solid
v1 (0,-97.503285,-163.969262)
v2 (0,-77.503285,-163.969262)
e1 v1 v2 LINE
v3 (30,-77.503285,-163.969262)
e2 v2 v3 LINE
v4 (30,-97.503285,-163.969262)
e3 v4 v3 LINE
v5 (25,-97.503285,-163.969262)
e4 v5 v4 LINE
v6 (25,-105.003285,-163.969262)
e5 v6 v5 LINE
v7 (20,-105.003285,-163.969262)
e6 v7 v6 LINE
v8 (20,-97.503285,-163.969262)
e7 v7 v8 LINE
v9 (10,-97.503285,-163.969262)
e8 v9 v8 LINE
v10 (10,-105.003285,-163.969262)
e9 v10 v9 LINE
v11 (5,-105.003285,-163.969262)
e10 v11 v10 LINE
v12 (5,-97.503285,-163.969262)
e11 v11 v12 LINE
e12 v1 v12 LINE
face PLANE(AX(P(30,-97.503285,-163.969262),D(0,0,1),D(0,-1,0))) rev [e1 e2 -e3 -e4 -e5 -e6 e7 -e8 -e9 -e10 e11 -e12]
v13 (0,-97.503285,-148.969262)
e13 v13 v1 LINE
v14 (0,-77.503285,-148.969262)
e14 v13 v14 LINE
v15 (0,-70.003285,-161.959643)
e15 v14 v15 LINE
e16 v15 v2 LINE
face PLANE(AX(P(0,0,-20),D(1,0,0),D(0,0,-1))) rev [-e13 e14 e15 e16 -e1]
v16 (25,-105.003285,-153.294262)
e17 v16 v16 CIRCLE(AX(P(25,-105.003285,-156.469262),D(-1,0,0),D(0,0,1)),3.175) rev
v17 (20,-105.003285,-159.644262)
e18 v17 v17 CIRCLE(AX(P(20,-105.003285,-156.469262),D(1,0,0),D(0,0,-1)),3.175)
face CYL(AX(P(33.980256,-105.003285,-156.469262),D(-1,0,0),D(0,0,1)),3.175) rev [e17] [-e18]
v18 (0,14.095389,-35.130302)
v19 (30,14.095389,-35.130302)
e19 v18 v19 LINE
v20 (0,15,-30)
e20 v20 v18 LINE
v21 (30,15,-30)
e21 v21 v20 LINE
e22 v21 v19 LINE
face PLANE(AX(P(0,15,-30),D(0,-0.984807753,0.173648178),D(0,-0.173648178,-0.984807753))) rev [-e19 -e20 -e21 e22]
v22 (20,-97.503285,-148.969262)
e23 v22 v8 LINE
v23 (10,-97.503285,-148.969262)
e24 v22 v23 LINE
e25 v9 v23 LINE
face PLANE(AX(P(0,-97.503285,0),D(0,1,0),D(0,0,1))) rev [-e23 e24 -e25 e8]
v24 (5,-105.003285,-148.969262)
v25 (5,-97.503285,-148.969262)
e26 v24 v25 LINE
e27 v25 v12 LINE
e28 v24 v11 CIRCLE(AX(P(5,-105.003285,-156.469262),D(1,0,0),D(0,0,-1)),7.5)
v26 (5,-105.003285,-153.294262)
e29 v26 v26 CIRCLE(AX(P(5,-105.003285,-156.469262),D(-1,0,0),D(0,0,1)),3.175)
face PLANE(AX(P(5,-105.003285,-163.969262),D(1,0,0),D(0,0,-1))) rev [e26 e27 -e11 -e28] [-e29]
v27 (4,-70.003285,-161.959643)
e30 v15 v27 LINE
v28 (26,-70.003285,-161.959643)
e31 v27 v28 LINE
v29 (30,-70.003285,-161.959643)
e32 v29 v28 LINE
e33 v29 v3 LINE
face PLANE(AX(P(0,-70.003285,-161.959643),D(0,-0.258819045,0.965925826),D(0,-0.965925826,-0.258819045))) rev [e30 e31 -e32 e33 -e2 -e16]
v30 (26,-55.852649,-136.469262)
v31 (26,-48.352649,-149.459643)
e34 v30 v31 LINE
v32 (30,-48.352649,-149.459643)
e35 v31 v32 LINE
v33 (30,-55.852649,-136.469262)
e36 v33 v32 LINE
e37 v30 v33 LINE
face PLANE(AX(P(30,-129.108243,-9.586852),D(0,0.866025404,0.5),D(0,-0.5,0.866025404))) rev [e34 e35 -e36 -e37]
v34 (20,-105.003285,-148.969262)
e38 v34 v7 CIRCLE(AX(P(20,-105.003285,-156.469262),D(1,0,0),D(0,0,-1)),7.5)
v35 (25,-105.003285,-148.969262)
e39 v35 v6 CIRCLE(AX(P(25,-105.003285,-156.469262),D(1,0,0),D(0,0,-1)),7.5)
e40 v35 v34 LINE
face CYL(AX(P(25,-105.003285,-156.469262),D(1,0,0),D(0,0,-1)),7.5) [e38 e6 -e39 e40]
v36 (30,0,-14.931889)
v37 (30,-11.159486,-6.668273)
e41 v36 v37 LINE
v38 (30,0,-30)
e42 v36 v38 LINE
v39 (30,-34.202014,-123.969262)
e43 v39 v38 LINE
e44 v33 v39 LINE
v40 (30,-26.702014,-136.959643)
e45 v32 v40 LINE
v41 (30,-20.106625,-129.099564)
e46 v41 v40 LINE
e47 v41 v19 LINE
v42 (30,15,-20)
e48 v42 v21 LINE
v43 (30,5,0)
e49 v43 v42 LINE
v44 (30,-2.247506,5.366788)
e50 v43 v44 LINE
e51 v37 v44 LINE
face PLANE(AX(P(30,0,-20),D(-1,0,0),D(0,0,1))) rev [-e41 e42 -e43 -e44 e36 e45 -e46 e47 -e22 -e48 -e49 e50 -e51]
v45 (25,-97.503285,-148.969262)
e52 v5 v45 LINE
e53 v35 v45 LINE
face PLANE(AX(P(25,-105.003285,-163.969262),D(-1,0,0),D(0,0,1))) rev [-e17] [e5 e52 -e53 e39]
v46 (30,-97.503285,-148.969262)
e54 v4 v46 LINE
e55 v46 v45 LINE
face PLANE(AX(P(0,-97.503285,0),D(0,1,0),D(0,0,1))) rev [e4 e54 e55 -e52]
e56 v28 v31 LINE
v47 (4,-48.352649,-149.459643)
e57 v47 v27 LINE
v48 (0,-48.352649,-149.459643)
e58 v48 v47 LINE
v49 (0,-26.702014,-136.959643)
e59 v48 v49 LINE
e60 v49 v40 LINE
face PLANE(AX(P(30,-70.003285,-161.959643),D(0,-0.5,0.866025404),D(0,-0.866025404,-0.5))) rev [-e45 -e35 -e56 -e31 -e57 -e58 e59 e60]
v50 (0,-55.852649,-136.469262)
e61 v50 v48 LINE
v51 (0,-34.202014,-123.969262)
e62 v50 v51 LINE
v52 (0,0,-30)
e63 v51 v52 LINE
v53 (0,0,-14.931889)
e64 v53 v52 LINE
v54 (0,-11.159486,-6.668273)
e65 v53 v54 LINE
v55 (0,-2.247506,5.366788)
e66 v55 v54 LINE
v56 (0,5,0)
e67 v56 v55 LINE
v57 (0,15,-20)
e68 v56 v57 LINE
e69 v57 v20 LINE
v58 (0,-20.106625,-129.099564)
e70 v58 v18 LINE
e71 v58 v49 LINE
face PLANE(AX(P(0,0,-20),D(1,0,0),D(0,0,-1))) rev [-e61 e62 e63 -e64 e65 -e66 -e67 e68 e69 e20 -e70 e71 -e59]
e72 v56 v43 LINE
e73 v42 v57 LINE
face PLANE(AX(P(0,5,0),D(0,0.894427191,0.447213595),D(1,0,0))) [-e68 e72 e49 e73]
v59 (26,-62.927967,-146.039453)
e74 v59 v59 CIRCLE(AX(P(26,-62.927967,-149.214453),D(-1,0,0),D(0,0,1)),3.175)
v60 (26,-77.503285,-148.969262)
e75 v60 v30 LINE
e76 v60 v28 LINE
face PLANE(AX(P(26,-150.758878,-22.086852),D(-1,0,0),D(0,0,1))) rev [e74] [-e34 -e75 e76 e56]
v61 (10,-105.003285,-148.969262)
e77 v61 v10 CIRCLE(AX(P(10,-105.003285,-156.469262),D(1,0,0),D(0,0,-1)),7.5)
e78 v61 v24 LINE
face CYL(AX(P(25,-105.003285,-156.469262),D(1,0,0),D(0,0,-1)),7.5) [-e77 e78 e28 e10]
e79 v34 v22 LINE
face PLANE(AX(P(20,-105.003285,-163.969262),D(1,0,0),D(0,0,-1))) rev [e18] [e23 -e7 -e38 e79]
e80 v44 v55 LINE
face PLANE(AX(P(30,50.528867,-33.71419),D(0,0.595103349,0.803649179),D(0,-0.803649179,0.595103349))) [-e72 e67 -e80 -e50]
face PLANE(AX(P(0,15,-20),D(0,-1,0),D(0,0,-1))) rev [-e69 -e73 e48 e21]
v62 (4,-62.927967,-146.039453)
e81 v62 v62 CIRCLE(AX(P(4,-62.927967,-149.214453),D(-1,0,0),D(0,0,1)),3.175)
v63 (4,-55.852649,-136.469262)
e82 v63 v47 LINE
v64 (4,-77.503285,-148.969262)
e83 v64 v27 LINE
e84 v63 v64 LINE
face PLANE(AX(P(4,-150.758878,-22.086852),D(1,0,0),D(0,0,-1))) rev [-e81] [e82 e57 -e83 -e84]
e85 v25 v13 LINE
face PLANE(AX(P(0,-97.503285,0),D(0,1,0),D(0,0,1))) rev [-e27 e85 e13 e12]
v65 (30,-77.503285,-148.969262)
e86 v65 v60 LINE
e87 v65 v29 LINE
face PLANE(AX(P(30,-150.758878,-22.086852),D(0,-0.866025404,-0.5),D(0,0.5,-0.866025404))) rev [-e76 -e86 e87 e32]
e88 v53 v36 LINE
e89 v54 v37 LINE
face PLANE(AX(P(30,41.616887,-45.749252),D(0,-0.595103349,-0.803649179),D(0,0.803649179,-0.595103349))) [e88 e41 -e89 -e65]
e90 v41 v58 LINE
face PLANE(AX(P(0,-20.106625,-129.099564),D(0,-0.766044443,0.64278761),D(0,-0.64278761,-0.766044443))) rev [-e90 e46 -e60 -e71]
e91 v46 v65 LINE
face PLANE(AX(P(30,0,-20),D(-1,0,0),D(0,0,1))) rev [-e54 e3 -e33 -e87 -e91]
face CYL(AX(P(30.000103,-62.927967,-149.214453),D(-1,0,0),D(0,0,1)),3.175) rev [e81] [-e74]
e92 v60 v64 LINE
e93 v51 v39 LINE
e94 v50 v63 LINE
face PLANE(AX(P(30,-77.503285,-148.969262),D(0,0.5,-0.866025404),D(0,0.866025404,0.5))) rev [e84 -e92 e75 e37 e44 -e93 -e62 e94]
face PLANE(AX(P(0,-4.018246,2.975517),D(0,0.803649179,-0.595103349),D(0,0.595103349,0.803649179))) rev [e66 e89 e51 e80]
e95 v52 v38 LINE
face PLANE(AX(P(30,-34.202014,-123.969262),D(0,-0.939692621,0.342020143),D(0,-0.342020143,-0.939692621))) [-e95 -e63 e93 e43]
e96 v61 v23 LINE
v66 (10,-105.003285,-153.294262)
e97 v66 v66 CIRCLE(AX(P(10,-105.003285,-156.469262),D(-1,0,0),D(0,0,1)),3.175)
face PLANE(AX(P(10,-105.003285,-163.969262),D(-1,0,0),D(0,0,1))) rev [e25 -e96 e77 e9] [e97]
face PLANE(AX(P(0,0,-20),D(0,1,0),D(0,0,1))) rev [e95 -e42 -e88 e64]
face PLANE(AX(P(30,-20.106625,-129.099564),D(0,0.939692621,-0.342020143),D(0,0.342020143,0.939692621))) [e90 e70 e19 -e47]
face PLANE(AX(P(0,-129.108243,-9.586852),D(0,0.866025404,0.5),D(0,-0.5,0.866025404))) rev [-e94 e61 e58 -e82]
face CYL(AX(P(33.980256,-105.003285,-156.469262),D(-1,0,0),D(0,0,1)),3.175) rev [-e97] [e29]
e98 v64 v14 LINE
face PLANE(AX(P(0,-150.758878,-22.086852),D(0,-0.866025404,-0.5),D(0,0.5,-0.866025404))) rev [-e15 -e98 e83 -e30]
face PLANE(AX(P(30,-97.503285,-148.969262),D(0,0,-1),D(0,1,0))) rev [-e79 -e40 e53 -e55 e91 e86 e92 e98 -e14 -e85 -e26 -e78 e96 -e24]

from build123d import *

# Parameters (mm, degrees)
SKETCH2_W                        = 30
SKETCH2_H                        = 15
BOSS_EXTRUDE1_DEPTH              = 10
BOUNDARY1_DEPTH                  = 30
BOSS_EXTRUDE2_DEPTH              = 30
SKETCH4_W                        = 30
SKETCH4_H                        = 15
BOSS_EXTRUDE3_DEPTH              = 100
SKETCH6_W                        = 18
SKETCH6_H                        = 15
BOSS_EXTRUDE4_DEPTH              = 9
BOSS_EXTRUDE5_DEPTH              = 18
CUT_EXTRUDE1_REACH               = 151.344
SKETCH8_R                        = 3
CUT_EXTRUDE2_REACH               = 139.38
SKETCH11_W                       = 30
SKETCH11_H                       = 15
SKETCH12_W                       = 30
SKETCH12_H                       = 15
BOSS_EXTRUDE7_DEPTH              = 50
BOSS_EXTRUDE8_DEPTH              = 30
SKETCH14_W                       = 30
SKETCH14_H                       = 15
BOSS_EXTRUDE10_DEPTH             = 20
BOSS_EXTRUDE11_DEPTH             = 30
SKETCH15_W                       = 5
SKETCH15_H                       = 15
BOSS_EXTRUDE12_DEPTH             = 7.5
SKETCH16_W                       = 5
SKETCH16_H                       = 7.5
REVOLVE1_ANGLE                   = 180
CUT_EXTRUDE3_REACH               = 202.419
SKETCH17_R                       = 3.175
SKETCH18_W                       = 4
SKETCH18_H                       = 25
CUT_EXTRUDE4_DEPTH               = 191.993712728
SKETCH20_R                       = 3.175
CUT_EXTRUDE5_DEPTH               = 201.546523118
SKETCH21_W                       = 30
SKETCH21_H                       = 12
BOSS_EXTRUDE13_DEPTH             = 5
BOSS_EXTRUDE13_DIRECTION_2_REACH = 203.104
SKETCH22_W                       = 30
SKETCH22_H                       = 2.975516747
BOSS_EXTRUDE14_DEPTH             = 5
BOSS_EXTRUDE14_DIRECTION_2_REACH = 203.104


# Read off the part's stored shape, not the designer's step: Boundary1
with BuildPart() as part:
    # Sketch2 → Boss-Extrude1 (new body)
    with BuildSketch(Plane.XY.offset(-30)):
        with Locations((15, 7.5)):
            Rectangle(SKETCH2_W, SKETCH2_H)
    extrude(amount=BOSS_EXTRUDE1_DEPTH)

    # Boundary1 outline → Boundary1 (add)
    with BuildSketch(Plane.YZ):
        Polygon((0, 0), (0, -20), (15, -20), (5, 0), align=None)
    extrude(amount=BOUNDARY1_DEPTH)

    # 3DSketch3 → Boss-Extrude2 (add)
    with BuildSketch(Plane(origin=(0, 15, -30), x_dir=(0, -1, 0), z_dir=(1, 0, 0))):
        Polygon((0, 0), (0.904610688, 5.13030215), (15, 0), align=None)
    extrude(amount=BOSS_EXTRUDE2_DEPTH)

    # Sketch4 → Boss-Extrude3 (add)
    with BuildSketch(Plane(origin=(0, -9.641814145, -26.490666647), x_dir=(1, 0, 0), z_dir=(0, 0.34202014332566943, 0.9396926207859081))):
        with Locations((15, 17.7606043)):
            Rectangle(SKETCH4_W, SKETCH4_H)
    extrude(amount=-BOSS_EXTRUDE3_DEPTH)

    # Sketch6 → Boss-Extrude4 (add)
    with BuildSketch(Plane(origin=(0, -43.843828478, -120.459928725), x_dir=(-1, 0, 0), z_dir=(0, -0.3420201433256693, -0.9396926207859083))):
        with Locations((-15, 17.7606043)):
            Rectangle(SKETCH6_W, SKETCH6_H)
    extrude(amount=BOSS_EXTRUDE4_DEPTH)

    # Sketch7 → Boss-Extrude5 (add)
    with BuildSketch(Plane.ZY.offset(-6)):
        with BuildLine():
            Line((-137.556797816, -23.184806311), (-132.426495666, -37.280195622))
            ThreePointArc((-132.426495666, -37.280195622), (-142.039341397, -32.797652042), (-137.556797816, -23.184806311))
        make_face()
    extrude(amount=-BOSS_EXTRUDE5_DEPTH)

    # Sketch8 → Cut-Extrude1 (cut, up to next)
    with BuildSketch(Plane.ZY.offset(-6), mode=Mode.PRIVATE) as cut_extrude1_sk1:
        with Locations((-134.991646741, -30.232500967)):
            Circle(SKETCH8_R)
    cut_extrude1_tool1 = extrude(cut_extrude1_sk1.sketch, amount=-CUT_EXTRUDE1_REACH, mode=Mode.PRIVATE) & part.part
    add(cut_extrude1_tool1.solids().sort_by_distance((6, -30.232501, -134.991647))[0], mode=Mode.SUBTRACT)

    # Sketch11 → Cut-Extrude2 (cut, up to next)
    with BuildSketch(Plane(origin=(0, -43.843828478, -120.459928725), x_dir=(-1, 0, 0), z_dir=(0, -0.3420201433256693, -0.9396926207859083)), mode=Mode.PRIVATE) as cut_extrude2_sk1:
        with Locations((-15, 17.7606043)):
            Rectangle(SKETCH11_W, SKETCH11_H)
    cut_extrude2_tool1 = extrude(cut_extrude2_sk1.sketch, amount=CUT_EXTRUDE2_REACH, mode=Mode.PRIVATE) & part.part
    add(cut_extrude2_tool1.solids().sort_by_distance((15, -27.15432, -126.534413))[0], mode=Mode.SUBTRACT)



with BuildPart() as body_2:
    # Sketch12 → Boss-Extrude7 (new body)
    with BuildSketch(Plane(origin=(0, -79.331775874, -45.802222156), x_dir=(1, 0, 0), z_dir=(0, -0.8660254037844397, -0.49999999999999833))):
        with Locations((15, -97.759523082)):
            Rectangle(SKETCH12_W, SKETCH12_H)
    extrude(amount=BOSS_EXTRUDE7_DEPTH)


with BuildPart() as part_1:
    add(part.part)

    add(body_2.part)  # Boss-Extrude8 merges body 2
    # 3DSketch4 → Boss-Extrude8 (add)
    with BuildSketch(Plane(origin=(0, -20.106625021, -129.099564228), x_dir=(0, -0.9396926207859082, 0.3420201433256692), z_dir=(1, 0, 0))):
        Polygon((0, 0), (3.509333353, 9.641814145), (15, 0), align=None)
    extrude(amount=BOSS_EXTRUDE8_DEPTH)



with BuildPart() as body_2_2:
    # Sketch14 → Boss-Extrude10 (new body)
    with BuildSketch(Plane(origin=(0, -77.503284522, 0), x_dir=(-1, 0, 0), z_dir=(0, -1, 0))):
        with Locations((-15, 156.469262079)):
            Rectangle(SKETCH14_W, SKETCH14_H)
    extrude(amount=BOSS_EXTRUDE10_DEPTH)


with BuildPart() as part_2:
    add(part_1.part)

    add(body_2_2.part)  # Boss-Extrude11 merges body 2 2
    # 3DSketch5 → Boss-Extrude11 (add)
    with BuildSketch(Plane(origin=(0, -77.503284522, -163.969262079), x_dir=(0, 0, 1), z_dir=(-1, 0, 0))):
        Polygon((0, 0), (15, 0), (2.009618943, 7.5), align=None)
    extrude(amount=-BOSS_EXTRUDE11_DEPTH)

    # Sketch15 → Boss-Extrude12 (add)
    with BuildSketch(Plane.XZ.offset(97.503284522)):
        with Locations((7.5, -156.469262079)):
            Rectangle(SKETCH15_W, SKETCH15_H)
        with Locations((22.5, -156.469262079)):
            Rectangle(SKETCH15_W, SKETCH15_H)
    extrude(amount=BOSS_EXTRUDE12_DEPTH)

    # Sketch16 → Revolve1 (revolve)
    with BuildSketch(Plane.XZ.offset(105.003284522)):
        with Locations((22.5, -160.219262079)):
            Rectangle(SKETCH16_W, SKETCH16_H)
        with Locations((7.5, -160.219262079)):
            Rectangle(SKETCH16_W, SKETCH16_H)
    revolve(axis=Axis((25, -105.003284522, -156.469262079), (-1, 0, 0)), revolution_arc=REVOLVE1_ANGLE)

    # Cut-Extrude3: up to this face of the body (flat: up to its plane)
    cut_extrude3_end = Plane(part_2.part.faces().sort_by_distance((25, -104.30316058, -156.469262079))[0])
    # Sketch17 → Cut-Extrude3 (cut, up to the picked face)
    with BuildSketch(Plane.ZY.offset(-5), mode=Mode.PRIVATE) as cut_extrude3_sk1:
        with Locations((-156.469262079, -105.003284522)):
            Circle(SKETCH17_R)
    cut_extrude3_tool1 = split(extrude(cut_extrude3_sk1.sketch, amount=-CUT_EXTRUDE3_REACH, mode=Mode.PRIVATE), bisect_by=cut_extrude3_end, keep=Keep.BOTH, mode=Mode.PRIVATE)
    add(cut_extrude3_tool1.solids().sort_by(Axis((5, -105.003285, -156.469262), (1, 0, 0)))[0], mode=Mode.SUBTRACT)

    # Sketch18 → Cut-Extrude4 (cut, through all)
    with BuildSketch(Plane(origin=(0, 52.629761541, -91.157420979), x_dir=(-1, 0, 0), z_dir=(0, 0.4999999999999983, -0.8660254037844398))):
        with Locations((-2, -129.104444312)):
            Rectangle(SKETCH18_W, SKETCH18_H)
        with Locations((-28, -129.104444312)):
            Rectangle(SKETCH18_W, SKETCH18_H)
    extrude(amount=-CUT_EXTRUDE4_DEPTH, mode=Mode.SUBTRACT)

    # Sketch20 → Cut-Extrude5 (cut, through all)
    with BuildSketch(Plane.ZY.offset(-4)):
        with Locations((-149.214452607, -62.927966974)):
            Circle(SKETCH20_R)
    extrude(amount=-CUT_EXTRUDE5_DEPTH, mode=Mode.SUBTRACT)

    # Sketch21 → Boss-Extrude13 (add)
    with BuildSketch(Plane(origin=(0, 0, 0), x_dir=(-1, 0, 0), z_dir=(0, -0.8036491793257791, 0.5951033494856183))):
        with Locations((-15, 6)):
            Rectangle(SKETCH21_W, SKETCH21_H)
    extrude(amount=BOSS_EXTRUDE13_DEPTH)

    # Sketch21 → Boss-Extrude13 direction 2 (add, up to next)
    with BuildSketch(Plane(origin=(0, 0, 0), x_dir=(-1, 0, 0), z_dir=(0, -0.8036491793257791, 0.5951033494856183)), mode=Mode.PRIVATE) as boss_extrude13_direction_2_sk1:
        with Locations((-15, 6)):
            Rectangle(SKETCH21_W, SKETCH21_H)
    boss_extrude13_direction_2_tool1 = extrude(boss_extrude13_direction_2_sk1.sketch, amount=-BOSS_EXTRUDE13_DIRECTION_2_REACH, mode=Mode.PRIVATE) - part_2.part
    add(boss_extrude13_direction_2_tool1.solids().sort_by_distance((15, -3.57062, -4.821895))[0])

    # Sketch22 → Boss-Extrude14 (add)
    with BuildSketch(Plane(origin=(0, 0, 0), x_dir=(-1, 0, 0), z_dir=(0, -0.8036491793257791, 0.5951033494856183))):
        with Locations((-15, -1.487758374)):
            Rectangle(SKETCH22_W, SKETCH22_H)
    extrude(amount=BOSS_EXTRUDE14_DEPTH)

    # Boss-Extrude14 direction 2: up to this plane
    boss_extrude14_direction_2_end = Plane(origin=(0, 5, 0), z_dir=(0, 0.894427190999916, 0.447213595499958))
    # Sketch22 → Boss-Extrude14 direction 2 (add, up to the surface)
    with BuildSketch(Plane(origin=(0, 0, 0), x_dir=(-1, 0, 0), z_dir=(0, -0.8036491793257791, 0.5951033494856183)), mode=Mode.PRIVATE) as boss_extrude14_direction_2_sk1:
        with Locations((-15, -1.487758374)):
            Rectangle(SKETCH22_W, SKETCH22_H)
    boss_extrude14_direction_2_tool1 = split(extrude(boss_extrude14_direction_2_sk1.sketch, amount=-BOSS_EXTRUDE14_DIRECTION_2_REACH, mode=Mode.PRIVATE), bisect_by=boss_extrude14_direction_2_end, keep=Keep.BOTH, mode=Mode.PRIVATE)
    add(boss_extrude14_direction_2_tool1.solids().sort_by_distance((15, 0.88537, 1.195636))[0])


solid = part_2.part
